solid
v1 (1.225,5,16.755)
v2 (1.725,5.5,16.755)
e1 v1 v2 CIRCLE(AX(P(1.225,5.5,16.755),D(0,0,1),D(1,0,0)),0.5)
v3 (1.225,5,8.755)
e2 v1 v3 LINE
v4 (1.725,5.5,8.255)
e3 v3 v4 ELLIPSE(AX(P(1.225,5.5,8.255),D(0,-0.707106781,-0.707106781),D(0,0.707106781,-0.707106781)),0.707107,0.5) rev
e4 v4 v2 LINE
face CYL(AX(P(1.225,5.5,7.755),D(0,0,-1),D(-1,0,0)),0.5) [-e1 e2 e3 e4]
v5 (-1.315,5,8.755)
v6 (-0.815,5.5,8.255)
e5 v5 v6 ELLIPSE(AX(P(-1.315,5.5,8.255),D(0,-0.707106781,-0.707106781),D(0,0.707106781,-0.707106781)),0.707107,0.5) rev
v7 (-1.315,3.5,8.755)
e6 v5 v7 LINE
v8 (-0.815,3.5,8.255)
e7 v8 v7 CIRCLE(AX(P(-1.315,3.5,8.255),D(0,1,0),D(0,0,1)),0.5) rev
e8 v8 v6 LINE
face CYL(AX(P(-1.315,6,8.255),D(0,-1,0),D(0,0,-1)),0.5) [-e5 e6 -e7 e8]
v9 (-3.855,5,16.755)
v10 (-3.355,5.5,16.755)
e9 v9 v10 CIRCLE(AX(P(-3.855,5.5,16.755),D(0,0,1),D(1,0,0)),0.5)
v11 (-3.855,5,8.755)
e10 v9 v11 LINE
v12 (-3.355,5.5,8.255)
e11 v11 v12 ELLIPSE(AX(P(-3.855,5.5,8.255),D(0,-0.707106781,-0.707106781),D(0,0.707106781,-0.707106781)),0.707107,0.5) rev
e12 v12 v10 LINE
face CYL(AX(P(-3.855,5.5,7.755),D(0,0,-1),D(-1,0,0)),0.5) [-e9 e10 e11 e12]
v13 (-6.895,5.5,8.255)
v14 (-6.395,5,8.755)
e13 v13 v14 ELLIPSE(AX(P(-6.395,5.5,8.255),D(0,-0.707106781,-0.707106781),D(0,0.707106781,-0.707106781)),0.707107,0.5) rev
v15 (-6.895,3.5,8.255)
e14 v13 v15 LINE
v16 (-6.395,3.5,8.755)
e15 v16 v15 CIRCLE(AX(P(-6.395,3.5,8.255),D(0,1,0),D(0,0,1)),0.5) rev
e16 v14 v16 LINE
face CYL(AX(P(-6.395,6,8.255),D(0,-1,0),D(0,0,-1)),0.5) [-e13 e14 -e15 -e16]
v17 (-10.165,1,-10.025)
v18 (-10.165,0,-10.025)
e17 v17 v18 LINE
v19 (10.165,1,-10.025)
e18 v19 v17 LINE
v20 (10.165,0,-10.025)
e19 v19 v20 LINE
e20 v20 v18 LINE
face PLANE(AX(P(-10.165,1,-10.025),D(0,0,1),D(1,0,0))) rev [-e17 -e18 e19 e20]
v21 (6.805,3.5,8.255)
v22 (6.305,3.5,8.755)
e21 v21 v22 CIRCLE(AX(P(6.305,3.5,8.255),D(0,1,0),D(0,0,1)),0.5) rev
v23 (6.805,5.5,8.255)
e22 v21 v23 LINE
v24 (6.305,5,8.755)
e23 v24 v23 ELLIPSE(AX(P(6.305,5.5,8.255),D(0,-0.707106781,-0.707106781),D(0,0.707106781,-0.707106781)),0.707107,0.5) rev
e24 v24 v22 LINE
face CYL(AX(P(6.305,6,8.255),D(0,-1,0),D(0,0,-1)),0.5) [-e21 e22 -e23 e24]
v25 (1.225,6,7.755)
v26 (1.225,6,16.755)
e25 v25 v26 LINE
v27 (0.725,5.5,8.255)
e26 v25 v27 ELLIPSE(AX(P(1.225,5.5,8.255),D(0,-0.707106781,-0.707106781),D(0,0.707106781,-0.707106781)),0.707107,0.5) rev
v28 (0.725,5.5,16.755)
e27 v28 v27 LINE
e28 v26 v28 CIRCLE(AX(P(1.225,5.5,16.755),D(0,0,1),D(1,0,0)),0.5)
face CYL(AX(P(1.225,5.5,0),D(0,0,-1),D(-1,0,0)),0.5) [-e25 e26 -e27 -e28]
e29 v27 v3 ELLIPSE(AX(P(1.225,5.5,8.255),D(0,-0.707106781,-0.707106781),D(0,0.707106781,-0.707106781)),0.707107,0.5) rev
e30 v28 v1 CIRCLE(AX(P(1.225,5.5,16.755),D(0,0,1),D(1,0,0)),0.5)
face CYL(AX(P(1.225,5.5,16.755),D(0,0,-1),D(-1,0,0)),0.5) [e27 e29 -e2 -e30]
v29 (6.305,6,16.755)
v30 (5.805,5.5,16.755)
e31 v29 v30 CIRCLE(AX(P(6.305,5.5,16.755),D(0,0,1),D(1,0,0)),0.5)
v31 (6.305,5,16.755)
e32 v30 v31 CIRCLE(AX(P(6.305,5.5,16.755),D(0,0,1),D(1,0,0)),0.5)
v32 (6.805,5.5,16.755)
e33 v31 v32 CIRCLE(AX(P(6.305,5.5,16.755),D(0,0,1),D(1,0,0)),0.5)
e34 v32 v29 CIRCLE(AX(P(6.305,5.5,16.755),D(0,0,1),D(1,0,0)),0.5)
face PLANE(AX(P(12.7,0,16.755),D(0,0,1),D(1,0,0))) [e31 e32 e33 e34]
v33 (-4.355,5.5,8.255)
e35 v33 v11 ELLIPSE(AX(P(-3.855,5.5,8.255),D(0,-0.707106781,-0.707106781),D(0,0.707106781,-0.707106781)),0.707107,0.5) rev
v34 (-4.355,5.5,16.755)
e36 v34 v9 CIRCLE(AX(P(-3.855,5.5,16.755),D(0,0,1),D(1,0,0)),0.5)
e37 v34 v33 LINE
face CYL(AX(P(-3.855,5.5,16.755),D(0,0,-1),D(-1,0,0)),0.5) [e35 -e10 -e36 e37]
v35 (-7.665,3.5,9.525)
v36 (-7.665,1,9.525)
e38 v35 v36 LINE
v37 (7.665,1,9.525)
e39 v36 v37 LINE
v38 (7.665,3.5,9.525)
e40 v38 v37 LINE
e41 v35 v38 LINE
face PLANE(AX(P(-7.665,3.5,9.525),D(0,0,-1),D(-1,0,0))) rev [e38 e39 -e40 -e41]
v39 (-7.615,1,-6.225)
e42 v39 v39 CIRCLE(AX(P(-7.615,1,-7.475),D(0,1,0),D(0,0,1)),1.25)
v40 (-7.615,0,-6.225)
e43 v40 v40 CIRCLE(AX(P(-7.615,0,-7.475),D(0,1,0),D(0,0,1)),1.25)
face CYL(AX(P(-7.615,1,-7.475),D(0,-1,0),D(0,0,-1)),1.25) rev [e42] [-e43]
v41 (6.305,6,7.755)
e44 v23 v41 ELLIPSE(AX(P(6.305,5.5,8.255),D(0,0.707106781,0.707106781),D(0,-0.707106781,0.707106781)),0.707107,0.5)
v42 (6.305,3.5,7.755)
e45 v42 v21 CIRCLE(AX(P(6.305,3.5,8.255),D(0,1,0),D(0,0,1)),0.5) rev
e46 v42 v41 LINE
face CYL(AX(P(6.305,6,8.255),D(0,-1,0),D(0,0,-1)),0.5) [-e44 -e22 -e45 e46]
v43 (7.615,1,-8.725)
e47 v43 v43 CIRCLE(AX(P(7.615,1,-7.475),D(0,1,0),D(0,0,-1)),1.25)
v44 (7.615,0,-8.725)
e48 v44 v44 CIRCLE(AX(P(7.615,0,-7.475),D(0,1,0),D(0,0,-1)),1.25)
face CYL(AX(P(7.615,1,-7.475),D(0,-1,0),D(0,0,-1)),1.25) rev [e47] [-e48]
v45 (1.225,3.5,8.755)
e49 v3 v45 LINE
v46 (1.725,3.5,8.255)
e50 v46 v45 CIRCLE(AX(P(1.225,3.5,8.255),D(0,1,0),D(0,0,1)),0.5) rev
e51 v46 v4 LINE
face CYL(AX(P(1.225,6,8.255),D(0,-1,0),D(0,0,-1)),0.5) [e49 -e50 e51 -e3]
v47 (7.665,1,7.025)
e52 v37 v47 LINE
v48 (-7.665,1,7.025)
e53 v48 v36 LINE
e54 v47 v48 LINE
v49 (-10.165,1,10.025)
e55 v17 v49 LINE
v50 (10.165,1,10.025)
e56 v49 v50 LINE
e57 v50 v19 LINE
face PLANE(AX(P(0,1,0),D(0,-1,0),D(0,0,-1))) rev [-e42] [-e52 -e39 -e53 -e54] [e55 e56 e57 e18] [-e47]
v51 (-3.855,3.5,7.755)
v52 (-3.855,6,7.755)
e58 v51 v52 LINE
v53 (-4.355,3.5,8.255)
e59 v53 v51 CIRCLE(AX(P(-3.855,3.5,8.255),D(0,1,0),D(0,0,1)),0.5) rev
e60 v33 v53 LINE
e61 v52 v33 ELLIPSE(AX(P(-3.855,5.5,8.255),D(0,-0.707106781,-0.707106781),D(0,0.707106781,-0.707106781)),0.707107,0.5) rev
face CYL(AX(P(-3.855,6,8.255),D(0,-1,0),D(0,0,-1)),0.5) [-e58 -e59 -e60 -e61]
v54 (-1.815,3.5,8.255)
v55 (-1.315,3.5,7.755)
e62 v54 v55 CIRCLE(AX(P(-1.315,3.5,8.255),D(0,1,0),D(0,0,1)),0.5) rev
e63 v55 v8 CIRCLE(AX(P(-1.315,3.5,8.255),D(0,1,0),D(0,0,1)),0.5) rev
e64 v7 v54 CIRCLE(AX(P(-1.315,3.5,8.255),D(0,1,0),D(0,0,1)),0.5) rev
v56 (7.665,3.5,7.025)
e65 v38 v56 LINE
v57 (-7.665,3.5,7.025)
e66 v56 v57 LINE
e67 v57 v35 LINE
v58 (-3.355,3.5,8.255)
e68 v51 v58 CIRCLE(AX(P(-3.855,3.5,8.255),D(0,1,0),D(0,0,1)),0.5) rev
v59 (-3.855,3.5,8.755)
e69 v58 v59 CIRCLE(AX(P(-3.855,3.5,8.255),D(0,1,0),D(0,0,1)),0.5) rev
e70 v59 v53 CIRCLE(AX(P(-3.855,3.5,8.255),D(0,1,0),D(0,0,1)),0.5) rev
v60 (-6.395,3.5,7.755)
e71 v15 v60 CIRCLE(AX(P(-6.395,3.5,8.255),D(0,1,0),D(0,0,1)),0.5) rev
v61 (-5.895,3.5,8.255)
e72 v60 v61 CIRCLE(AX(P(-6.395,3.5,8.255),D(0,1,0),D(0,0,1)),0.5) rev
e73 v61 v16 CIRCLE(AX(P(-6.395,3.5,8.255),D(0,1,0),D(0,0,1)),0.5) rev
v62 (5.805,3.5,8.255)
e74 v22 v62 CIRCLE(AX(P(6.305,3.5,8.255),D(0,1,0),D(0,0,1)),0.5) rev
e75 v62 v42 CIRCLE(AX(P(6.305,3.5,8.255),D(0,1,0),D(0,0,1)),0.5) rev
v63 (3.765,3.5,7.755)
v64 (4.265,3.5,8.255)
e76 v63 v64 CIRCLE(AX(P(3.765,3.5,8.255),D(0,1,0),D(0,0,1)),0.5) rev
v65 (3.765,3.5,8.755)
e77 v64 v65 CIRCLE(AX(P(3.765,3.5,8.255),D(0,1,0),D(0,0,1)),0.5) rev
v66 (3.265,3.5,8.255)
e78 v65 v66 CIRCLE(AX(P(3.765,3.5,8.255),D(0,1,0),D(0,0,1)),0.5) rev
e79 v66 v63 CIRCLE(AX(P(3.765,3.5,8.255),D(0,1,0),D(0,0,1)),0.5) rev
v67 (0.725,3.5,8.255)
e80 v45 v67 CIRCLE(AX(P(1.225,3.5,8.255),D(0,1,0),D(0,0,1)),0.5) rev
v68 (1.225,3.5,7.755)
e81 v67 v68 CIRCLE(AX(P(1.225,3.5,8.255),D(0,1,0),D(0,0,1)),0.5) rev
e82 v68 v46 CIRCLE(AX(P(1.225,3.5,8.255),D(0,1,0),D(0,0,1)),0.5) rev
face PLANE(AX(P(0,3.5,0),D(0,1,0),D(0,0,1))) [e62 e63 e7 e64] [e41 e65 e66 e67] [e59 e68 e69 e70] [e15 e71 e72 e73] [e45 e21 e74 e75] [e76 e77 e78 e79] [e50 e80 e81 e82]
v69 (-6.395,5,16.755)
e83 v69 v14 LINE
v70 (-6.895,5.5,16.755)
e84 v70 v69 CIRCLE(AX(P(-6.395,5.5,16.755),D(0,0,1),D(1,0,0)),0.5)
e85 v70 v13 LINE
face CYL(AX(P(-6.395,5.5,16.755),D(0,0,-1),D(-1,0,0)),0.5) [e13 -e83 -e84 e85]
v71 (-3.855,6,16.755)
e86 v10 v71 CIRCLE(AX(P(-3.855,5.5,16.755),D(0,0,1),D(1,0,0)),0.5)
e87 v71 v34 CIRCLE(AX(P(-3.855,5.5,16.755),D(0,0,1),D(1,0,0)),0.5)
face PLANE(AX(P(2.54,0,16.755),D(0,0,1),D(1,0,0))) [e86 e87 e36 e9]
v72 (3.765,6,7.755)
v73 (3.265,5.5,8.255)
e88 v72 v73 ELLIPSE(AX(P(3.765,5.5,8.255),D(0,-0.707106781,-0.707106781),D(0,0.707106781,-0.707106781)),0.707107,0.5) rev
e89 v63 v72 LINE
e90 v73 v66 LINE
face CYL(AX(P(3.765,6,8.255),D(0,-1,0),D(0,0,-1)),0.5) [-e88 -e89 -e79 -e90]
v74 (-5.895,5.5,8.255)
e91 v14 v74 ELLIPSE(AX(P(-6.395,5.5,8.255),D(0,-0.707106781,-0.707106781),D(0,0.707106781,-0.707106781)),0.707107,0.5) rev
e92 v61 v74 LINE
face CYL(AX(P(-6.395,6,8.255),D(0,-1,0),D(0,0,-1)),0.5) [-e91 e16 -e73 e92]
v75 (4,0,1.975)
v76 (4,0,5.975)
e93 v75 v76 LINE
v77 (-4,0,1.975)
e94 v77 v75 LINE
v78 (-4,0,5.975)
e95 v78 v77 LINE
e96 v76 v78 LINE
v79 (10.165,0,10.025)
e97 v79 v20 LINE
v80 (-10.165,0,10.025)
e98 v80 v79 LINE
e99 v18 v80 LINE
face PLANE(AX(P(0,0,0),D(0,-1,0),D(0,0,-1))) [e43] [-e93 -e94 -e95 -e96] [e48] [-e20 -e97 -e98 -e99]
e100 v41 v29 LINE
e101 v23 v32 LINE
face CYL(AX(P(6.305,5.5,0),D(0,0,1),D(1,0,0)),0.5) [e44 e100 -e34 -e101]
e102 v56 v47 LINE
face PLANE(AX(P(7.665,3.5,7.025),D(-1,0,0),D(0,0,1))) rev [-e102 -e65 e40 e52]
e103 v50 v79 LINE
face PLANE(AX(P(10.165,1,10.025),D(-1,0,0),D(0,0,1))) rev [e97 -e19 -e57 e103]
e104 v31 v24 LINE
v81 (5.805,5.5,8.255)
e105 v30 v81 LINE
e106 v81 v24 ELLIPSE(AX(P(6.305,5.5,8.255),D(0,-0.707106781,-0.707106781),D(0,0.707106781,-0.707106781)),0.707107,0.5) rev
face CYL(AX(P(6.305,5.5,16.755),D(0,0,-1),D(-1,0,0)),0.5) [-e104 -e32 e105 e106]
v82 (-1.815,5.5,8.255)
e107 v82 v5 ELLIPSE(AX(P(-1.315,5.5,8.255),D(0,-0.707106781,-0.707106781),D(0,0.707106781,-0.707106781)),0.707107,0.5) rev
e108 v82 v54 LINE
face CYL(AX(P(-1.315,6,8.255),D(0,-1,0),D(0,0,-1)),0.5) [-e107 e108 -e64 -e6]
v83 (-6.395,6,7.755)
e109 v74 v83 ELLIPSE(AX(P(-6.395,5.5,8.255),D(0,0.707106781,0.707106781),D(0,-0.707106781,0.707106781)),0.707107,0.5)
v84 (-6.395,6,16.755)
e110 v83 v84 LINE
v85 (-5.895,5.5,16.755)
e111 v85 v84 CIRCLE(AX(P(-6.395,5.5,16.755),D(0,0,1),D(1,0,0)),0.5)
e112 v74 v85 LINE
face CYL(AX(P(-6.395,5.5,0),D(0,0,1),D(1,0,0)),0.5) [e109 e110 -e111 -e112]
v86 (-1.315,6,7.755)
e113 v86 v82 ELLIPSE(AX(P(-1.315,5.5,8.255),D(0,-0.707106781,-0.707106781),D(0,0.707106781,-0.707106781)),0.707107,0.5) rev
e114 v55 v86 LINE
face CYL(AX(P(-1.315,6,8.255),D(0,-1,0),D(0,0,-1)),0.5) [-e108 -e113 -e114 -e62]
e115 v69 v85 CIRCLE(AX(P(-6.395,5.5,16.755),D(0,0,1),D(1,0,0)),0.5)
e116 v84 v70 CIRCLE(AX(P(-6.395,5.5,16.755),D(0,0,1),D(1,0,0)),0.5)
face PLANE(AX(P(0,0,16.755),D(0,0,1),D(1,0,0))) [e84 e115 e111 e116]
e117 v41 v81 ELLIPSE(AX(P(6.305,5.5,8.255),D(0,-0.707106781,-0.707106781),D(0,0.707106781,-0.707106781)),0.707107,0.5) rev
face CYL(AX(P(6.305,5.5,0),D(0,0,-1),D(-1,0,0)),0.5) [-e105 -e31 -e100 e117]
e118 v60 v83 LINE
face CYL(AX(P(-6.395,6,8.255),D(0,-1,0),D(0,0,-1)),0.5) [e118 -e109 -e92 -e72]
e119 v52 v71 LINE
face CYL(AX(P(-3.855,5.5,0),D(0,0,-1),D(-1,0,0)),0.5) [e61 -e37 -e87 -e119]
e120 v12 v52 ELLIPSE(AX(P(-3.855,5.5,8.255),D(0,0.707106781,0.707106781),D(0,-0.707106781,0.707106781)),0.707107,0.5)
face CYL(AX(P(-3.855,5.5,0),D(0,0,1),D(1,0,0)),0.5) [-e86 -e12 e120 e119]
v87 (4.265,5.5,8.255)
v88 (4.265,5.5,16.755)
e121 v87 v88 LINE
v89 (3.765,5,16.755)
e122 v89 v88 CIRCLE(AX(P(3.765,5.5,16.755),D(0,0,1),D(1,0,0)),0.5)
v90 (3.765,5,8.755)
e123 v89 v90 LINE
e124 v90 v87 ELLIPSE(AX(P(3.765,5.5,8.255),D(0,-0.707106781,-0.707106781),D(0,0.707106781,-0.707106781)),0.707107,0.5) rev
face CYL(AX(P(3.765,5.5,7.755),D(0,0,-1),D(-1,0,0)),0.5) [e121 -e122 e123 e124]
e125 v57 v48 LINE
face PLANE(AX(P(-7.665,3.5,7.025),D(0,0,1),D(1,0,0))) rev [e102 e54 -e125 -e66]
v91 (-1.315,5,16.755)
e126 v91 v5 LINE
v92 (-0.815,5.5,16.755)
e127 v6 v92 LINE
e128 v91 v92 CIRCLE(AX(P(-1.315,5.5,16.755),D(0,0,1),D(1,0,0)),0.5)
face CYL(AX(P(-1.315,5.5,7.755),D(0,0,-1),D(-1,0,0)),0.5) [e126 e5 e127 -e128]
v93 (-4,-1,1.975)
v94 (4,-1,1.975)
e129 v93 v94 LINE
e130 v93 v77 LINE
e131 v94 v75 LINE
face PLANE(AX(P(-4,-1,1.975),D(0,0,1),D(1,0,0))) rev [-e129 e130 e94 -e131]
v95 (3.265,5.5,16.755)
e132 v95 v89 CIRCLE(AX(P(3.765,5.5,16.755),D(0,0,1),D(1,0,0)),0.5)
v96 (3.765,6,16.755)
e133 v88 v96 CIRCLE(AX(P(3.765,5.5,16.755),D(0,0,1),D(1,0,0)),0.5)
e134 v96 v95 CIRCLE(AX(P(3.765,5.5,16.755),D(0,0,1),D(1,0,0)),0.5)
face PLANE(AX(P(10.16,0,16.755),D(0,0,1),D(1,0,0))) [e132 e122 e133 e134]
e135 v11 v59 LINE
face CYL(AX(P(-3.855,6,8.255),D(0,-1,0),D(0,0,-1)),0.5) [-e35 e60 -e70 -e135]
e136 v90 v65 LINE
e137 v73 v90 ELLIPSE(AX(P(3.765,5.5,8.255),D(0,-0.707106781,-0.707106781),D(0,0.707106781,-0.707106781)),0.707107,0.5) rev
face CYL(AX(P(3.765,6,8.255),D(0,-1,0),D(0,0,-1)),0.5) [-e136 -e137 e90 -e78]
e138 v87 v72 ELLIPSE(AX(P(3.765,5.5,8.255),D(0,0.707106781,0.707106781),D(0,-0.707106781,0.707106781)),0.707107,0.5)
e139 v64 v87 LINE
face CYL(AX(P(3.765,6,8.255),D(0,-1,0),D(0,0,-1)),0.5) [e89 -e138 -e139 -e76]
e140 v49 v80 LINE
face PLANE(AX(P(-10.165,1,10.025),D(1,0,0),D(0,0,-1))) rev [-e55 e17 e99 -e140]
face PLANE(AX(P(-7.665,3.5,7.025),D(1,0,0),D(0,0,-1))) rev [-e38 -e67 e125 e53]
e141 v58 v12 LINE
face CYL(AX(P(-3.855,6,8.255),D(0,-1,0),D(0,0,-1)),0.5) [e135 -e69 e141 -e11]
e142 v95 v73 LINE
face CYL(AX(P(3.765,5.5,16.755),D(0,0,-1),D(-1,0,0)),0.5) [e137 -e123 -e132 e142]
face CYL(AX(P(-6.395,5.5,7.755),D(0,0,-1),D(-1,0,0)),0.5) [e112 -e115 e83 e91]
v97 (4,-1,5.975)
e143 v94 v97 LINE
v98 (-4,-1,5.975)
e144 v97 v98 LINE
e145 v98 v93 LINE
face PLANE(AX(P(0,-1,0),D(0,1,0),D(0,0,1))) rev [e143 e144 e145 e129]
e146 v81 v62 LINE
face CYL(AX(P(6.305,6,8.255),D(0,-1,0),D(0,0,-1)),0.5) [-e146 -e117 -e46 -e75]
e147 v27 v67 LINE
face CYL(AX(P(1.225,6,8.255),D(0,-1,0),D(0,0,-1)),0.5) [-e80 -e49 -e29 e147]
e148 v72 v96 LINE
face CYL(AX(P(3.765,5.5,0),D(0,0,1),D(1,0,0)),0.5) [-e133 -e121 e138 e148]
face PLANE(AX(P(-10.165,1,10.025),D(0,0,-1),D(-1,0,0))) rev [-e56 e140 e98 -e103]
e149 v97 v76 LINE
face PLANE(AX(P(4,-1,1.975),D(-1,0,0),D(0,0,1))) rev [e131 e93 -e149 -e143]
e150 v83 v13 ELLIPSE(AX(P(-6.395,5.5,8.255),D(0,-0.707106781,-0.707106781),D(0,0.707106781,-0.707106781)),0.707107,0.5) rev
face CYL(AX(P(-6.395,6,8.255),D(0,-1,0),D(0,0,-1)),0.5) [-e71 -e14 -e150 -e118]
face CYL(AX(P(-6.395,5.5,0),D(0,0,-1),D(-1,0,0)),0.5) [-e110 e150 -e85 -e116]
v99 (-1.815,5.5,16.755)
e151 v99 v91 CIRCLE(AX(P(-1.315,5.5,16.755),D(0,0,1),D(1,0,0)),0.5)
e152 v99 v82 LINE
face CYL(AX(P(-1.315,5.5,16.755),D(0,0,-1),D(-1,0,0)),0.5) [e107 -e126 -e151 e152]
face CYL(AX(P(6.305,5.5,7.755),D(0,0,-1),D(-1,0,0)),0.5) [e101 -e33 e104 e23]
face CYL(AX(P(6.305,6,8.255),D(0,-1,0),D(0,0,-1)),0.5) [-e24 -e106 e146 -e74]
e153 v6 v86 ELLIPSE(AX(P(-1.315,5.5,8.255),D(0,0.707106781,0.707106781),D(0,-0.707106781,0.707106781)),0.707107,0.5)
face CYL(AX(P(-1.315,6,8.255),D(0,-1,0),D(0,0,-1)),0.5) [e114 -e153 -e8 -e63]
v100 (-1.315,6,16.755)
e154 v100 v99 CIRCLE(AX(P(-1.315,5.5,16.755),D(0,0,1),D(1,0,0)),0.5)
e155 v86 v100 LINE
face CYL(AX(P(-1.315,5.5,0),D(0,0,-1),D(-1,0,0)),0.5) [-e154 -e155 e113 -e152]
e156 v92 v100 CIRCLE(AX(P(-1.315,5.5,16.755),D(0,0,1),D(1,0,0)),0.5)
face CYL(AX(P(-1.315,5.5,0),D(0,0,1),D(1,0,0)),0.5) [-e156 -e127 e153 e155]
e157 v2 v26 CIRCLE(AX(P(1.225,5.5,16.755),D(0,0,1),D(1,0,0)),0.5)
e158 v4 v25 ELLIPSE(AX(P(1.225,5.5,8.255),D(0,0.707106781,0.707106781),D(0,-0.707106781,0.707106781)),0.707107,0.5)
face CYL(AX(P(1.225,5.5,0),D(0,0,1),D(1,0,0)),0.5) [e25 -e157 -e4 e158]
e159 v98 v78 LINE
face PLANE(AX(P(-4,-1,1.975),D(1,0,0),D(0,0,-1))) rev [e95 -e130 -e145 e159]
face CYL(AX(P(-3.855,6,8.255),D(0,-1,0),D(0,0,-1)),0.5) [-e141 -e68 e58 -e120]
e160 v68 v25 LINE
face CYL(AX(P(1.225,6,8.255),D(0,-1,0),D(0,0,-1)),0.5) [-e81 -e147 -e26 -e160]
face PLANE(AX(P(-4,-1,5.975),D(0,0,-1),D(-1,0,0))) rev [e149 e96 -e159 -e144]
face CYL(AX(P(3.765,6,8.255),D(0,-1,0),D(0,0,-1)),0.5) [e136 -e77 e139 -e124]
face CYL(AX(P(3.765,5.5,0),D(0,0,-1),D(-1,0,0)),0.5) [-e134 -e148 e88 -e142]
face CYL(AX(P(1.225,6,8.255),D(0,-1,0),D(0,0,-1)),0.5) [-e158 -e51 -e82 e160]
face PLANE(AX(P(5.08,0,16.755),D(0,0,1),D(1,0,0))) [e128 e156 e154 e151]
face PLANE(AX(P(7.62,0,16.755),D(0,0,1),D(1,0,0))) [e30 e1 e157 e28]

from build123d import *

# Parameters (mm, degrees)
SKETCH1_W              = 20.33
SKETCH1_H              = 20.05
SKETCH1_R              = 1.25
BOSS_EXTRUDE1_DEPTH    = 1
SKETCH2_W              = 8
SKETCH2_H              = 4
BOSS_EXTRUDE2_DEPTH    = 1
SKETCH3_W              = 15.33
SKETCH3_H              = 2.5
BOSS_EXTRUDE3_DEPTH    = 2.5
SKETCH4_W              = 1
SKETCH4_H              = 1
BOSS_EXTRUDE4_DEPTH    = 2.5
SKETCH5_W              = 1
SKETCH5_H              = 1
BOSS_EXTRUDE5_DEPTH    = 8
FILLET1_R              = 0.5
LPATTERN4_COUNT        = 6
LPATTERN4_PITCH        = 2.54
FILLET1_OF_LPATTERN4_R = 0.5


with BuildPart() as part:
    # Sketch1 → Boss-Extrude1 (new body)
    with BuildSketch(Plane(origin=(0, 0, 0), x_dir=(1, 0, 0), z_dir=(0, 1, 0))):
        Rectangle(SKETCH1_W, SKETCH1_H)
        with Locations(Location((-7.615, 7.475, 0), (0, 0, 270))):
            Circle(SKETCH1_R, mode=Mode.SUBTRACT)
        with Locations(Location((7.615, 7.475, 0), (0, 0, 90))):
            Circle(SKETCH1_R, mode=Mode.SUBTRACT)
    extrude(amount=BOSS_EXTRUDE1_DEPTH)

    # Sketch2 → Boss-Extrude2 (add)
    with BuildSketch(Plane.XZ):
        with Locations((0, 3.975)):
            Rectangle(SKETCH2_W, SKETCH2_H)
    extrude(amount=BOSS_EXTRUDE2_DEPTH)

    # Sketch3 → Boss-Extrude3 (add)
    with BuildSketch(Plane(origin=(0, 1, 0), x_dir=(1, 0, 0), z_dir=(0, 1, 0))):
        with Locations((0, -8.275)):
            Rectangle(SKETCH3_W, SKETCH3_H)
    extrude(amount=BOSS_EXTRUDE3_DEPTH)

    # Sketch4 → Boss-Extrude4 (add)
    with BuildSketch(Plane(origin=(0, 3.5, 0), x_dir=(1, 0, 0), z_dir=(0, 1, 0))):
        with Locations((-6.395, -8.255)):
            Rectangle(SKETCH4_W, SKETCH4_H)
    boss_extrude4 = extrude(amount=BOSS_EXTRUDE4_DEPTH)

    # Sketch5 → Boss-Extrude5 (add)
    with BuildSketch(Plane.XY.offset(8.755)):
        with Locations((-6.395, 5.5)):
            Rectangle(SKETCH5_W, SKETCH5_H)
    boss_extrude5 = extrude(amount=BOSS_EXTRUDE5_DEPTH)

    # Fillet1
    fillet1_edges = [part.edges().sort_by_distance(p)[0] for p in [
        (-5.895, 5, 12.755),
        (-6.895, 5, 12.755),
        (-5.895, 4.25, 8.755),
        (-6.895, 4.25, 8.755),
        (-5.895, 4.75, 7.755),
        (-6.895, 4.75, 7.755),
        (-5.895, 6, 12.255),
        (-6.895, 6, 12.255),
    ]]
    fillet(fillet1_edges, radius=FILLET1_R - 0.0001)  # a hair under: the kernel refuses the full size

    # LPattern4: Boss-Extrude4, Boss-Extrude5 ×6
    with Locations(*[(i * LPATTERN4_PITCH, 0, 0) for i in range(1, LPATTERN4_COUNT)]):
        add(boss_extrude4)
        add(boss_extrude5)

    # Fillet1 of LPattern4
    fillet1_of_lpattern4_edges = [part.edges().sort_by_distance(p)[0] for p in [
        (-3.355, 5, 12.755),
        (-4.355, 5, 12.755),
        (-3.355, 4.25, 8.755),
        (-4.355, 4.25, 8.755),
        (-3.355, 4.75, 7.755),
        (-4.355, 4.75, 7.755),
        (-3.355, 6, 12.255),
        (-4.355, 6, 12.255),
        (-0.815, 5, 12.755),
        (-1.815, 5, 12.755),
        (-0.815, 4.25, 8.755),
        (-1.815, 4.25, 8.755),
        (-0.815, 4.75, 7.755),
        (-1.815, 4.75, 7.755),
        (-0.815, 6, 12.255),
        (-1.815, 6, 12.255),
        (1.725, 5, 12.755),
        (0.725, 5, 12.755),
        (1.725, 4.25, 8.755),
        (0.725, 4.25, 8.755),
        (1.725, 4.75, 7.755),
        (0.725, 4.75, 7.755),
        (1.725, 6, 12.255),
        (0.725, 6, 12.255),
        (4.265, 5, 12.755),
        (3.265, 5, 12.755),
        (4.265, 4.25, 8.755),
        (3.265, 4.25, 8.755),
        (4.265, 4.75, 7.755),
        (3.265, 4.75, 7.755),
        (4.265, 6, 12.255),
        (3.265, 6, 12.255),
        (6.805, 5, 12.755),
        (5.805, 5, 12.755),
        (6.805, 4.25, 8.755),
        (5.805, 4.25, 8.755),
        (6.805, 4.75, 7.755),
        (5.805, 4.75, 7.755),
        (6.805, 6, 12.255),
        (5.805, 6, 12.255),
    ]]
    fillet(fillet1_of_lpattern4_edges, radius=FILLET1_OF_LPATTERN4_R - 0.0001)  # a hair under: the kernel refuses the full size


solid = part.part
